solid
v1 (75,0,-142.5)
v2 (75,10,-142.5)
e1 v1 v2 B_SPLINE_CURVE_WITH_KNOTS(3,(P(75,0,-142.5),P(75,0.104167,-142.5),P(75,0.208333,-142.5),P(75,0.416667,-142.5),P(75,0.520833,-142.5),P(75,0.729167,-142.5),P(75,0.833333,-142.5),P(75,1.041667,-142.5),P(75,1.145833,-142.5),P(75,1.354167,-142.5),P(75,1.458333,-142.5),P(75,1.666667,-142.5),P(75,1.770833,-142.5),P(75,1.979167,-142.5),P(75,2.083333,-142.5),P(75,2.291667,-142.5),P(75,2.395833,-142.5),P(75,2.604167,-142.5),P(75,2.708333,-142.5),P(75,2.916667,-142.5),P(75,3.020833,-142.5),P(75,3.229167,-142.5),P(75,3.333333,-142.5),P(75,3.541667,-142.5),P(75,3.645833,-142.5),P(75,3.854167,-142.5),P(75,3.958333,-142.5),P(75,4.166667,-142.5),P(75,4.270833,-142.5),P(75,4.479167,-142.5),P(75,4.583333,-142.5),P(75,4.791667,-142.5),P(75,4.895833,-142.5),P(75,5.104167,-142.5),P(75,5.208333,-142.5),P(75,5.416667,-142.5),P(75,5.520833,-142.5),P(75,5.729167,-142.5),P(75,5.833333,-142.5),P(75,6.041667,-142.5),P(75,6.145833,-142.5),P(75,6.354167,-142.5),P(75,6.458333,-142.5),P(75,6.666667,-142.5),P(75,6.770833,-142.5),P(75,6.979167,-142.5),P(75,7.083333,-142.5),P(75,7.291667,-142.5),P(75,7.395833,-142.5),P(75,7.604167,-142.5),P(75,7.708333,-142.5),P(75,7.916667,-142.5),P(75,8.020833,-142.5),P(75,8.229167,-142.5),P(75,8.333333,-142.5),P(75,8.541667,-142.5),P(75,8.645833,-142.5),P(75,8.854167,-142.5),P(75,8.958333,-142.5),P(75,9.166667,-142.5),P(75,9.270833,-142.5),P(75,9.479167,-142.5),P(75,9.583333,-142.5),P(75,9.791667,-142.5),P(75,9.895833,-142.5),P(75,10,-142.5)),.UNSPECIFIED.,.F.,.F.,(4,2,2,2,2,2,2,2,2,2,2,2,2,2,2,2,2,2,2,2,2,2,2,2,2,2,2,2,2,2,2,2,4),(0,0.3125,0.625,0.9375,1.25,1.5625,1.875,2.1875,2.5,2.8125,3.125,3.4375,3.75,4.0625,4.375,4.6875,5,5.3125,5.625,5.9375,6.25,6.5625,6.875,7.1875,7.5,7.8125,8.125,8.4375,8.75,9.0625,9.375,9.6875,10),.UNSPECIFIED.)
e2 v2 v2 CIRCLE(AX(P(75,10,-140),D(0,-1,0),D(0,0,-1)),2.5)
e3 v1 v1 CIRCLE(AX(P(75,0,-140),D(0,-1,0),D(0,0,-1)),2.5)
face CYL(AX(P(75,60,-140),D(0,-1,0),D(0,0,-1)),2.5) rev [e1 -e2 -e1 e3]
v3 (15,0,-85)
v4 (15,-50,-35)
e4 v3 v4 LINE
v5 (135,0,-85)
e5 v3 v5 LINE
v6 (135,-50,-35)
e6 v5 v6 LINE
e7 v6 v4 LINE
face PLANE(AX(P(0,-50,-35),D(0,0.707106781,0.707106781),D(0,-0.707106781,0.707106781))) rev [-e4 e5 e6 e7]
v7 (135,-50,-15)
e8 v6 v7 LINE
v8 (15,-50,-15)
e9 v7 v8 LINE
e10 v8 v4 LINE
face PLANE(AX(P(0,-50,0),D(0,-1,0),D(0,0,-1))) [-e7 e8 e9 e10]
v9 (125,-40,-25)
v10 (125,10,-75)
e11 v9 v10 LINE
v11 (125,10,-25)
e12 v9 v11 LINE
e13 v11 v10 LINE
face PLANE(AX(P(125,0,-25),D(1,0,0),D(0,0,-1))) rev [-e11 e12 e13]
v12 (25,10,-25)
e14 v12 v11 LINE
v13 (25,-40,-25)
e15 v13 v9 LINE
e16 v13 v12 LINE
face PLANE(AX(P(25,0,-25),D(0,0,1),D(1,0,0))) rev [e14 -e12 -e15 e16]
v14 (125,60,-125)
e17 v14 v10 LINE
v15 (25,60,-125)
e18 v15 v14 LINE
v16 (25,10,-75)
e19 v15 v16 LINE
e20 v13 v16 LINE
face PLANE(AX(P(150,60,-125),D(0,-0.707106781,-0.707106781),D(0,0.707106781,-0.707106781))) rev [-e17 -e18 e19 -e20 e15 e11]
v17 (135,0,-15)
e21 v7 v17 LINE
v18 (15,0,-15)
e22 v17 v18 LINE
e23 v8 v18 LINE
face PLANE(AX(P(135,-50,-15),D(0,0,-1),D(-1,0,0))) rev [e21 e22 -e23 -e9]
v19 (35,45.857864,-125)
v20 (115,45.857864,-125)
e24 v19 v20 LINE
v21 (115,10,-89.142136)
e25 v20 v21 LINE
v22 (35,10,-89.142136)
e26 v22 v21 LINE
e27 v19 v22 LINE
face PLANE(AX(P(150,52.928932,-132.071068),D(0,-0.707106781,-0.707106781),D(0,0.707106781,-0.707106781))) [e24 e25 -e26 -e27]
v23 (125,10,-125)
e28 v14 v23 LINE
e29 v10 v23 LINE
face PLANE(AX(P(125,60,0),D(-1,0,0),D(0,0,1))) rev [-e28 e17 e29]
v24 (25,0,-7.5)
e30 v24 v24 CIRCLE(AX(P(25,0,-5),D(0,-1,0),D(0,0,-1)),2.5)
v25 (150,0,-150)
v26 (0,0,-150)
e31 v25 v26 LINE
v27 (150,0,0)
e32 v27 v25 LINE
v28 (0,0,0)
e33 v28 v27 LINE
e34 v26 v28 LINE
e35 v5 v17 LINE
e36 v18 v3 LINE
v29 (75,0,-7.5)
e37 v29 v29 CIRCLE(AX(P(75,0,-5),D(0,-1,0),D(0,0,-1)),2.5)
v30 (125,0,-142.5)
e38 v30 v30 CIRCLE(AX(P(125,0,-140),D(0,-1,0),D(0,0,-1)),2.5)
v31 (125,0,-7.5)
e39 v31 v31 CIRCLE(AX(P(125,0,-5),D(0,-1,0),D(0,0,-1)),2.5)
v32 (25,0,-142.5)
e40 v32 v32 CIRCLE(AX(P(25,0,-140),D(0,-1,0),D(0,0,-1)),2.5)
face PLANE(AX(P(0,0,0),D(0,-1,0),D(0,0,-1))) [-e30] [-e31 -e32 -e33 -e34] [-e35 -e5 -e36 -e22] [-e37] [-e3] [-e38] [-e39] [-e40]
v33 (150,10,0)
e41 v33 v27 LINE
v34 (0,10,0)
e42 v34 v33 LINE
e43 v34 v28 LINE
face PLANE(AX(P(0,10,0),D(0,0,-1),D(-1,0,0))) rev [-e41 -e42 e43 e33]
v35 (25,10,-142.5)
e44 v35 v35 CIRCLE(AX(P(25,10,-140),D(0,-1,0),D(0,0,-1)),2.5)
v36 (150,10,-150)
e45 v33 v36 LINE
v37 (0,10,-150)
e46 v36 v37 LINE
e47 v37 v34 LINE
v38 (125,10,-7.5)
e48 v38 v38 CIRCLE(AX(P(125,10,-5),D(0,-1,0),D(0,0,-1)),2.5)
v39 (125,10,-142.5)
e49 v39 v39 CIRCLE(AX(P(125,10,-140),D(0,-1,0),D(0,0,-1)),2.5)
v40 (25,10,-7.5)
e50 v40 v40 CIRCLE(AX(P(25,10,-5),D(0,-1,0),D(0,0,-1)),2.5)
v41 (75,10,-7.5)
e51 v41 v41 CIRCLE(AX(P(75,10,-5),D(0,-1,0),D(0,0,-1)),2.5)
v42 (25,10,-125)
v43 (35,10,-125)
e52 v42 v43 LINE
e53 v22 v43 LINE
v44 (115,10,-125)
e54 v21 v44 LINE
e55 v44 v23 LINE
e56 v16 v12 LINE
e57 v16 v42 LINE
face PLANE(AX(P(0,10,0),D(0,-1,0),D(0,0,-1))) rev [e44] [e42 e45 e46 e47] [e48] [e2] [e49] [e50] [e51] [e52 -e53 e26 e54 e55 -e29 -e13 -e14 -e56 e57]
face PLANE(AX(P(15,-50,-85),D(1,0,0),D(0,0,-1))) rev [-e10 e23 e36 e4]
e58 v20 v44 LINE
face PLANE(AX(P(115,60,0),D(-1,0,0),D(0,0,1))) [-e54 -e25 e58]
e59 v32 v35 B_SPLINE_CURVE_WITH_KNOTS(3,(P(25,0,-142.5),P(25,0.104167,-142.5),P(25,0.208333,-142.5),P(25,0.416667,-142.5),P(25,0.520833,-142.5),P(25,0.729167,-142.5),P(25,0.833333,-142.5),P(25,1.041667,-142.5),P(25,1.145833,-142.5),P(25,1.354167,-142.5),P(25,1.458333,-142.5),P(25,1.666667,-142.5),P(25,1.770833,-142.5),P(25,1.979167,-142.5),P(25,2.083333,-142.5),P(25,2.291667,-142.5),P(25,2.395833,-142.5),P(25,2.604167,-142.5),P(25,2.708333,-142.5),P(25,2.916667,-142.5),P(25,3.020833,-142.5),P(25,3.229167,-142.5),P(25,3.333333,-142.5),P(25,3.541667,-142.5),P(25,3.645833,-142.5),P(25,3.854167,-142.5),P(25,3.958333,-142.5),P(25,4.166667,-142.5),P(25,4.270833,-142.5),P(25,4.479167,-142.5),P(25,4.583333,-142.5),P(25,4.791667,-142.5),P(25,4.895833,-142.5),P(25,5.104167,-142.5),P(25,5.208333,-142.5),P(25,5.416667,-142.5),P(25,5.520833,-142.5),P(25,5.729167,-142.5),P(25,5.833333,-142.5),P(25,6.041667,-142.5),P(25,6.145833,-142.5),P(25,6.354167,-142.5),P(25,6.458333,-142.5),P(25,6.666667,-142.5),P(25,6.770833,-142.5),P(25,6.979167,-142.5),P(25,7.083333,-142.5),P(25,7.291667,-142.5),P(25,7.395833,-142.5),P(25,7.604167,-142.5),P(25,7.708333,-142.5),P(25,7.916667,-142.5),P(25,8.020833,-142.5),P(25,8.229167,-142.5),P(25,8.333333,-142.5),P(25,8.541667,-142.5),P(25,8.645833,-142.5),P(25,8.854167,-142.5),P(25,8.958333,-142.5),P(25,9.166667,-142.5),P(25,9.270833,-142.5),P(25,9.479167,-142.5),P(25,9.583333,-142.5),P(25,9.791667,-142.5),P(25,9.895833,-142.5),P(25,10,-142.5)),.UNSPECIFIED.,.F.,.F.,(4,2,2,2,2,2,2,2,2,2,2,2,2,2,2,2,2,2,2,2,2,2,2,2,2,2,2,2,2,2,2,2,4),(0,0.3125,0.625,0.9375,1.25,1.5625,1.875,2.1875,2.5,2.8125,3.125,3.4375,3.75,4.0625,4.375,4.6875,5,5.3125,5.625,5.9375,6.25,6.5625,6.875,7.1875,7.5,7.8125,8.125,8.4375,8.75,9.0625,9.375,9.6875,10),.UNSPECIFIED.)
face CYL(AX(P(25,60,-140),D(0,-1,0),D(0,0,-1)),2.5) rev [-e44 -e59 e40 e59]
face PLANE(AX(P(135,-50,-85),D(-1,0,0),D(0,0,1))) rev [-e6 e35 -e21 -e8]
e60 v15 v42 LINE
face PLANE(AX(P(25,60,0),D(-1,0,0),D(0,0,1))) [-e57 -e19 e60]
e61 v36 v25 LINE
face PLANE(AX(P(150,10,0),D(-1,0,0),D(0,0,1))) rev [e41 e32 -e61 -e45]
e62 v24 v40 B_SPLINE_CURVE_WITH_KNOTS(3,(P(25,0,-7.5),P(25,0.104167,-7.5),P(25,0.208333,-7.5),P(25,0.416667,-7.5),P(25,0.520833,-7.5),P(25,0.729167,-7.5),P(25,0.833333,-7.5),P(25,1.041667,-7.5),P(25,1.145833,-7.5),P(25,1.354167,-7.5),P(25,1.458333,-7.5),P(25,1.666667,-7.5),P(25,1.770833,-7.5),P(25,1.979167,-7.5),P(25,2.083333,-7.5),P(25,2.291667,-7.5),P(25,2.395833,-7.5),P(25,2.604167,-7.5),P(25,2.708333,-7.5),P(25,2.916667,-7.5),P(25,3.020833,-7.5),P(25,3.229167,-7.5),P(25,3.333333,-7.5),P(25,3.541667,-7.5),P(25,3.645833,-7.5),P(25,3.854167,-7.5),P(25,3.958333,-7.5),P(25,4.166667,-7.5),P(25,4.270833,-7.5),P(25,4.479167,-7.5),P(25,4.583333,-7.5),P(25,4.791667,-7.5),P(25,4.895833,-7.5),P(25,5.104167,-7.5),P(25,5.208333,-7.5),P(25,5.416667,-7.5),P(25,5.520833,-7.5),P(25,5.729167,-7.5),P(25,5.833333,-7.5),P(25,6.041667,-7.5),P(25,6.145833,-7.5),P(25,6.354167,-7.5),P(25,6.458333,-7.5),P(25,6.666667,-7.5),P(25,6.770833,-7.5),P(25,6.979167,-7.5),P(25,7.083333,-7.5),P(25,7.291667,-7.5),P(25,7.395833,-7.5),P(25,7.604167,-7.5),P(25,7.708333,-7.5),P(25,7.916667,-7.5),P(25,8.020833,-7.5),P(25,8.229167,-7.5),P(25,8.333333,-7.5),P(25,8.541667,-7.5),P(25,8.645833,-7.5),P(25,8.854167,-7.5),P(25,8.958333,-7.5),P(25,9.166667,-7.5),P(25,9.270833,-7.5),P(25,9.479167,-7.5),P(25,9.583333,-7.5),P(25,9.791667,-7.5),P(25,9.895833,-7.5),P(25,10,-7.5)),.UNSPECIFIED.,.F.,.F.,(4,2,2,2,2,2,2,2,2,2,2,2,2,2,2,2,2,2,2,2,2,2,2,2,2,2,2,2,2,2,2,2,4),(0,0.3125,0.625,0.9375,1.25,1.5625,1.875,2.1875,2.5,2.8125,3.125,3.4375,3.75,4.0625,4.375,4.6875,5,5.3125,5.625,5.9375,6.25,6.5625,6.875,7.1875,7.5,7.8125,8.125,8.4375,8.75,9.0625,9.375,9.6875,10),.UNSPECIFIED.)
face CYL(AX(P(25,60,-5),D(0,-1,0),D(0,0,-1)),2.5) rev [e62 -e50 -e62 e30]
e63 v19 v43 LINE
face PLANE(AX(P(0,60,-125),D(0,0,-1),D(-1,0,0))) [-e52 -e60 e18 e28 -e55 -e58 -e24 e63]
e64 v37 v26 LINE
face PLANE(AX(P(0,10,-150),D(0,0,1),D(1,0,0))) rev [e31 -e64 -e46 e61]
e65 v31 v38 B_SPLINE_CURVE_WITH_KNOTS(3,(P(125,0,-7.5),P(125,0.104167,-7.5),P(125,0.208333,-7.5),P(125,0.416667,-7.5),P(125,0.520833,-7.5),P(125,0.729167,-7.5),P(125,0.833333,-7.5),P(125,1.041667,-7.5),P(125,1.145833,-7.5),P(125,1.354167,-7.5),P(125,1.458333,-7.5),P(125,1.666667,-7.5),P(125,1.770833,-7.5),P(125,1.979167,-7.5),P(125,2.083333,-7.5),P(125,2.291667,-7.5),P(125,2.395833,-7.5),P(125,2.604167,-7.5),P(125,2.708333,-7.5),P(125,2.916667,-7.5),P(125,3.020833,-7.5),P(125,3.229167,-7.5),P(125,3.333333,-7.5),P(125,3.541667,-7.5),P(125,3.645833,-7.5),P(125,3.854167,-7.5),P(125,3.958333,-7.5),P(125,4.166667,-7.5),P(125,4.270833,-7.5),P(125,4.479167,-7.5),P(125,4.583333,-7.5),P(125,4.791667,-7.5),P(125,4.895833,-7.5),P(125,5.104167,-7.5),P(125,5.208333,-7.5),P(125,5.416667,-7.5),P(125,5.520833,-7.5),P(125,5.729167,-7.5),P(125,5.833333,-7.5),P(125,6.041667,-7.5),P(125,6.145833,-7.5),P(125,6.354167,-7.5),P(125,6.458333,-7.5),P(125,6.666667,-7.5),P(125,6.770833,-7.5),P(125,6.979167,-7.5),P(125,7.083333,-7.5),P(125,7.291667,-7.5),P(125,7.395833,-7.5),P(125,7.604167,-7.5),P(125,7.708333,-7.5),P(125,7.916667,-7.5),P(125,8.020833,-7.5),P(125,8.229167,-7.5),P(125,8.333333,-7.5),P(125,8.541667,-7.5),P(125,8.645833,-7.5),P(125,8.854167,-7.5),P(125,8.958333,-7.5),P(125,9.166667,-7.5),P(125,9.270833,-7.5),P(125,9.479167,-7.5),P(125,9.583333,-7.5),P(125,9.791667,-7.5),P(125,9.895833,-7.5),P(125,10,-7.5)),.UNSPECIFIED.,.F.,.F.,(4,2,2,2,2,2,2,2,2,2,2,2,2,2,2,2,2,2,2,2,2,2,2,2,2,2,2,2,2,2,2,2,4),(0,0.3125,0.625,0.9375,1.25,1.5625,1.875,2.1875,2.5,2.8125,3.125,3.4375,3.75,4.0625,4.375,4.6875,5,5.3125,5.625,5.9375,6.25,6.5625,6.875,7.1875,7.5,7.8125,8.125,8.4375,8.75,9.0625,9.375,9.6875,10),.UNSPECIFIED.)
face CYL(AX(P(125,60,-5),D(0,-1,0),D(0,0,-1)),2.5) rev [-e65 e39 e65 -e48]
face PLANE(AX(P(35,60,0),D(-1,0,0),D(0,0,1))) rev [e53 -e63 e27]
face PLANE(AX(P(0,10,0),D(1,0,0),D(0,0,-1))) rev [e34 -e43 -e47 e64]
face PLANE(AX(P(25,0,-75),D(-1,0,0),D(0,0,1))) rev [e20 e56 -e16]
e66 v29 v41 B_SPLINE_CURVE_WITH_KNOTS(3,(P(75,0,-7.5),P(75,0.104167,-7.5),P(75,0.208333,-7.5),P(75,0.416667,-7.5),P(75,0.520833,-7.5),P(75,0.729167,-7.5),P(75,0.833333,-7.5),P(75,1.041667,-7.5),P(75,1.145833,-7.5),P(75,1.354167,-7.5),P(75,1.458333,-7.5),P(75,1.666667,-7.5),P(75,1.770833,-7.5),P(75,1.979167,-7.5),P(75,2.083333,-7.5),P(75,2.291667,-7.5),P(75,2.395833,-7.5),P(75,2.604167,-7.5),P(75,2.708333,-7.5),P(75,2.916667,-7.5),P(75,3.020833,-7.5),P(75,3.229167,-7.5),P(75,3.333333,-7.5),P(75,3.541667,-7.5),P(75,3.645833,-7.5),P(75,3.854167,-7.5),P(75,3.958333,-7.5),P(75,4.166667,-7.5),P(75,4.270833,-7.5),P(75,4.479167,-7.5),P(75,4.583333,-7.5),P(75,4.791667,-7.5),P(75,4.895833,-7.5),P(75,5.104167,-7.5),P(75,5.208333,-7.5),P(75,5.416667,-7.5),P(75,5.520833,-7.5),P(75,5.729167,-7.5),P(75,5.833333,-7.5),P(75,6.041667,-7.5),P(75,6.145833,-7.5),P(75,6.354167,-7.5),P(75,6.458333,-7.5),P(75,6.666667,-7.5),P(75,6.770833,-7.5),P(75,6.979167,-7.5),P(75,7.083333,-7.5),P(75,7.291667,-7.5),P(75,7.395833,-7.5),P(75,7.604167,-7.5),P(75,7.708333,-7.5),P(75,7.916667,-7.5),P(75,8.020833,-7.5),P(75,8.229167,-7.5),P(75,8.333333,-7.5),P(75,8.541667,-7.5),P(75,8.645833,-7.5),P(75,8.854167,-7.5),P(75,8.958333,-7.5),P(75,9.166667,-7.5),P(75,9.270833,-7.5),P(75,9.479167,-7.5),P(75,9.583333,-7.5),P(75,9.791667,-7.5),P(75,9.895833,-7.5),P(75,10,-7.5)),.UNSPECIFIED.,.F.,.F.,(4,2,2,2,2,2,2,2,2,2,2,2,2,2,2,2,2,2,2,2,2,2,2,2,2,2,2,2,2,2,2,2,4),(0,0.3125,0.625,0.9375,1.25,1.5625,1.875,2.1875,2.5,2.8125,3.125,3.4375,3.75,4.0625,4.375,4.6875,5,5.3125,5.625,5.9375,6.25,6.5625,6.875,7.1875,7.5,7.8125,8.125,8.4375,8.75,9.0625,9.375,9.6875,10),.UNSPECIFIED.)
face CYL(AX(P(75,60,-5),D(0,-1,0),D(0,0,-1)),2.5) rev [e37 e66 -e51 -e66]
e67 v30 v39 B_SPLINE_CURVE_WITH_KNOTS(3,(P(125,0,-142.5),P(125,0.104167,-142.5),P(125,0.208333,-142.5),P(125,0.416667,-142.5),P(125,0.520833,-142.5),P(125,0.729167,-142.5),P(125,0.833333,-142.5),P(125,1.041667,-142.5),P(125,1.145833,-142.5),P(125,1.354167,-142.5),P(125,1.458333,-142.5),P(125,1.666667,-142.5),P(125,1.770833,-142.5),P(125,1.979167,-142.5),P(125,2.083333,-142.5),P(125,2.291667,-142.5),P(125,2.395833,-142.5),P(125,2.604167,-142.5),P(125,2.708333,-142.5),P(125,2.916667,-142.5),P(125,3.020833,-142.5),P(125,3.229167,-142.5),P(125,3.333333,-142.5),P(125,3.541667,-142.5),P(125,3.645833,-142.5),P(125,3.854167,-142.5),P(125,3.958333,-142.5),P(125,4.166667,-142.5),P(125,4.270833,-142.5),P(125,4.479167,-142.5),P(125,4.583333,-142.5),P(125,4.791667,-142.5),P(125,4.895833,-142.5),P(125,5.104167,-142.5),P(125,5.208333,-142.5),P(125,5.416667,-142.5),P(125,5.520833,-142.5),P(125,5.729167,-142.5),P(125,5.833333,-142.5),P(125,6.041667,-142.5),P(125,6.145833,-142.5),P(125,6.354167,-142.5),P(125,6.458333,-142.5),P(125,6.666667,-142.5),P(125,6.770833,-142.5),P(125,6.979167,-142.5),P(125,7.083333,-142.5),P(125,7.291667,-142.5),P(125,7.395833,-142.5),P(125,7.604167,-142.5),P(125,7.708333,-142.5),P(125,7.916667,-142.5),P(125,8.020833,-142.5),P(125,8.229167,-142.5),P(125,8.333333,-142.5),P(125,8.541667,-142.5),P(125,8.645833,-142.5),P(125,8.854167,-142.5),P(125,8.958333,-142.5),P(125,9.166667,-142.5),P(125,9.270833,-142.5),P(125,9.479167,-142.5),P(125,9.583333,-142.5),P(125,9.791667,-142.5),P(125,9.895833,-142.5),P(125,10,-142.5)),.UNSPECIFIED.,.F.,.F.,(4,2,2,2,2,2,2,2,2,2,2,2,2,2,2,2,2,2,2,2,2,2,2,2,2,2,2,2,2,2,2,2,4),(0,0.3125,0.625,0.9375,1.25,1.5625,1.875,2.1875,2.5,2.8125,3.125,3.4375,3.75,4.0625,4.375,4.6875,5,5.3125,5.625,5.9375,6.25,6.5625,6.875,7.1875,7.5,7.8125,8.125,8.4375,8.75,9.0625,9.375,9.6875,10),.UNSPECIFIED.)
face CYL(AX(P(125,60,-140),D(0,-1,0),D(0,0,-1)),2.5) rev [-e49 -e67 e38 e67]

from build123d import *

# Parameters (mm, degrees)
SKETCH1_W           = 150
SKETCH1_H           = 150
BOSS_EXTRUDE1_DEPTH = 10
SKETCH3_W           = 100
SKETCH3_H           = 50
BOSS_EXTRUDE2_DEPTH = 50
CUT_EXTRUDE1_DEPTH  = 205.266982158
SKETCH5_W           = 100
SKETCH5_H           = 50
CUT_EXTRUDE2_DEPTH  = 218.944947177
SKETCH7_W           = 120
SKETCH7_H           = 70
BOSS_EXTRUDE6_DEPTH = 50
BOSS_EXTRUDE7_DEPTH = 100
SKETCH9_W           = 100
SKETCH9_H           = 40
CUT_EXTRUDE4_DEPTH  = 40
BOSS_EXTRUDE8_DEPTH = 100
CUT_EXTRUDE5_DEPTH  = 211.535032714
SHELL1_START        = 35
SHELL1_DEPTH        = 80
SKETCH12_R          = 2.5
CUT_EXTRUDE6_DEPTH  = 221.45407685


# Read off the part's stored shape, not the designer's step: Shell1
with BuildPart() as part:
    # Sketch1 → Boss-Extrude1 (new body)
    with BuildSketch(Plane(origin=(0, 0, 0), x_dir=(1, 0, 0), z_dir=(0, 1, 0))):
        with Locations((75, 75)):
            Rectangle(SKETCH1_W, SKETCH1_H)
    extrude(amount=BOSS_EXTRUDE1_DEPTH)

    # Sketch3 → Boss-Extrude2 (add)
    with BuildSketch(Plane(origin=(0, 10, 0), x_dir=(1, 0, 0), z_dir=(0, 1, 0))):
        with Locations((75, 100)):
            Rectangle(SKETCH3_W, SKETCH3_H)
    extrude(amount=BOSS_EXTRUDE2_DEPTH)

    # Sketch4 → Cut-Extrude1 (cut, through all)
    with BuildSketch(Plane.ZY.offset(-25)):
        Polygon((-125, 60), (-75, 10), (-75, 60), align=None)
    extrude(amount=-CUT_EXTRUDE1_DEPTH, mode=Mode.SUBTRACT)

    # Sketch5 → Cut-Extrude2 (cut, through all)
    with BuildSketch(Plane(origin=(0, 10, 0), x_dir=(1, 0, 0), z_dir=(0, 1, 0))):
        with Locations((75, 50)):
            Rectangle(SKETCH5_W, SKETCH5_H)
    extrude(amount=-CUT_EXTRUDE2_DEPTH, mode=Mode.SUBTRACT)

    # Sketch7 → Boss-Extrude6 (add)
    with BuildSketch(Plane.XZ):
        with Locations((75, -50)):
            Rectangle(SKETCH7_W, SKETCH7_H)
    extrude(amount=BOSS_EXTRUDE6_DEPTH)

    # Sketch6 → Boss-Extrude7 (add)
    with BuildSketch(Plane(origin=(25, 0, 0), x_dir=(0, 0, -1), z_dir=(1, 0, 0))):
        Polygon((75, 0), (75, 10), (65, 0), align=None)
    extrude(amount=BOSS_EXTRUDE7_DEPTH)

    # Sketch9 → Cut-Extrude4 (cut)
    with BuildSketch(Plane(origin=(0, 0, 0), x_dir=(1, 0, 0), z_dir=(0, 1, 0))):
        with Locations((75, 45)):
            Rectangle(SKETCH9_W, SKETCH9_H)
    extrude(amount=-CUT_EXTRUDE4_DEPTH, mode=Mode.SUBTRACT)

    # Sketch10 → Boss-Extrude8 (add)
    with BuildSketch(Plane(origin=(25, 0, 0), x_dir=(0, 0, -1), z_dir=(1, 0, 0))):
        Polygon((65, 0), (25, -40), (65, -40), align=None)
    extrude(amount=BOSS_EXTRUDE8_DEPTH)

    # Sketch11 → Cut-Extrude5 (cut, through all)
    with BuildSketch(Plane(origin=(135, 0, 0), x_dir=(0, 0, -1), z_dir=(1, 0, 0))):
        Polygon((85, 0), (85, -50), (35, -50), align=None)
    extrude(amount=-CUT_EXTRUDE5_DEPTH, mode=Mode.SUBTRACT)

    # Shell1 outline → Shell1 (cut)
    with BuildSketch(Plane.YZ.offset(SHELL1_START)):
        Polygon((45.857864376, -125), (10, -89.142135624), (10, -125), align=None)
    extrude(amount=SHELL1_DEPTH, mode=Mode.SUBTRACT)

    # Sketch12 → Cut-Extrude6 (cut, through all)
    with BuildSketch(Plane.XZ):
        with Locations(Location((125, -140, 0), (0, 0, 270))):
            Circle(SKETCH12_R)
        with Locations(Location((75, -140, 0), (0, 0, 270))):
            Circle(SKETCH12_R)
        with Locations(Location((25, -140, 0), (0, 0, 270))):
            Circle(SKETCH12_R)
        with Locations(Location((125, -5, 0), (0, 0, 270))):
            Circle(SKETCH12_R)
        with Locations(Location((75, -5, 0), (0, 0, 270))):
            Circle(SKETCH12_R)
        with Locations(Location((25, -5, 0), (0, 0, 270))):
            Circle(SKETCH12_R)
    extrude(amount=-CUT_EXTRUDE6_DEPTH, mode=Mode.SUBTRACT)


solid = part.part
